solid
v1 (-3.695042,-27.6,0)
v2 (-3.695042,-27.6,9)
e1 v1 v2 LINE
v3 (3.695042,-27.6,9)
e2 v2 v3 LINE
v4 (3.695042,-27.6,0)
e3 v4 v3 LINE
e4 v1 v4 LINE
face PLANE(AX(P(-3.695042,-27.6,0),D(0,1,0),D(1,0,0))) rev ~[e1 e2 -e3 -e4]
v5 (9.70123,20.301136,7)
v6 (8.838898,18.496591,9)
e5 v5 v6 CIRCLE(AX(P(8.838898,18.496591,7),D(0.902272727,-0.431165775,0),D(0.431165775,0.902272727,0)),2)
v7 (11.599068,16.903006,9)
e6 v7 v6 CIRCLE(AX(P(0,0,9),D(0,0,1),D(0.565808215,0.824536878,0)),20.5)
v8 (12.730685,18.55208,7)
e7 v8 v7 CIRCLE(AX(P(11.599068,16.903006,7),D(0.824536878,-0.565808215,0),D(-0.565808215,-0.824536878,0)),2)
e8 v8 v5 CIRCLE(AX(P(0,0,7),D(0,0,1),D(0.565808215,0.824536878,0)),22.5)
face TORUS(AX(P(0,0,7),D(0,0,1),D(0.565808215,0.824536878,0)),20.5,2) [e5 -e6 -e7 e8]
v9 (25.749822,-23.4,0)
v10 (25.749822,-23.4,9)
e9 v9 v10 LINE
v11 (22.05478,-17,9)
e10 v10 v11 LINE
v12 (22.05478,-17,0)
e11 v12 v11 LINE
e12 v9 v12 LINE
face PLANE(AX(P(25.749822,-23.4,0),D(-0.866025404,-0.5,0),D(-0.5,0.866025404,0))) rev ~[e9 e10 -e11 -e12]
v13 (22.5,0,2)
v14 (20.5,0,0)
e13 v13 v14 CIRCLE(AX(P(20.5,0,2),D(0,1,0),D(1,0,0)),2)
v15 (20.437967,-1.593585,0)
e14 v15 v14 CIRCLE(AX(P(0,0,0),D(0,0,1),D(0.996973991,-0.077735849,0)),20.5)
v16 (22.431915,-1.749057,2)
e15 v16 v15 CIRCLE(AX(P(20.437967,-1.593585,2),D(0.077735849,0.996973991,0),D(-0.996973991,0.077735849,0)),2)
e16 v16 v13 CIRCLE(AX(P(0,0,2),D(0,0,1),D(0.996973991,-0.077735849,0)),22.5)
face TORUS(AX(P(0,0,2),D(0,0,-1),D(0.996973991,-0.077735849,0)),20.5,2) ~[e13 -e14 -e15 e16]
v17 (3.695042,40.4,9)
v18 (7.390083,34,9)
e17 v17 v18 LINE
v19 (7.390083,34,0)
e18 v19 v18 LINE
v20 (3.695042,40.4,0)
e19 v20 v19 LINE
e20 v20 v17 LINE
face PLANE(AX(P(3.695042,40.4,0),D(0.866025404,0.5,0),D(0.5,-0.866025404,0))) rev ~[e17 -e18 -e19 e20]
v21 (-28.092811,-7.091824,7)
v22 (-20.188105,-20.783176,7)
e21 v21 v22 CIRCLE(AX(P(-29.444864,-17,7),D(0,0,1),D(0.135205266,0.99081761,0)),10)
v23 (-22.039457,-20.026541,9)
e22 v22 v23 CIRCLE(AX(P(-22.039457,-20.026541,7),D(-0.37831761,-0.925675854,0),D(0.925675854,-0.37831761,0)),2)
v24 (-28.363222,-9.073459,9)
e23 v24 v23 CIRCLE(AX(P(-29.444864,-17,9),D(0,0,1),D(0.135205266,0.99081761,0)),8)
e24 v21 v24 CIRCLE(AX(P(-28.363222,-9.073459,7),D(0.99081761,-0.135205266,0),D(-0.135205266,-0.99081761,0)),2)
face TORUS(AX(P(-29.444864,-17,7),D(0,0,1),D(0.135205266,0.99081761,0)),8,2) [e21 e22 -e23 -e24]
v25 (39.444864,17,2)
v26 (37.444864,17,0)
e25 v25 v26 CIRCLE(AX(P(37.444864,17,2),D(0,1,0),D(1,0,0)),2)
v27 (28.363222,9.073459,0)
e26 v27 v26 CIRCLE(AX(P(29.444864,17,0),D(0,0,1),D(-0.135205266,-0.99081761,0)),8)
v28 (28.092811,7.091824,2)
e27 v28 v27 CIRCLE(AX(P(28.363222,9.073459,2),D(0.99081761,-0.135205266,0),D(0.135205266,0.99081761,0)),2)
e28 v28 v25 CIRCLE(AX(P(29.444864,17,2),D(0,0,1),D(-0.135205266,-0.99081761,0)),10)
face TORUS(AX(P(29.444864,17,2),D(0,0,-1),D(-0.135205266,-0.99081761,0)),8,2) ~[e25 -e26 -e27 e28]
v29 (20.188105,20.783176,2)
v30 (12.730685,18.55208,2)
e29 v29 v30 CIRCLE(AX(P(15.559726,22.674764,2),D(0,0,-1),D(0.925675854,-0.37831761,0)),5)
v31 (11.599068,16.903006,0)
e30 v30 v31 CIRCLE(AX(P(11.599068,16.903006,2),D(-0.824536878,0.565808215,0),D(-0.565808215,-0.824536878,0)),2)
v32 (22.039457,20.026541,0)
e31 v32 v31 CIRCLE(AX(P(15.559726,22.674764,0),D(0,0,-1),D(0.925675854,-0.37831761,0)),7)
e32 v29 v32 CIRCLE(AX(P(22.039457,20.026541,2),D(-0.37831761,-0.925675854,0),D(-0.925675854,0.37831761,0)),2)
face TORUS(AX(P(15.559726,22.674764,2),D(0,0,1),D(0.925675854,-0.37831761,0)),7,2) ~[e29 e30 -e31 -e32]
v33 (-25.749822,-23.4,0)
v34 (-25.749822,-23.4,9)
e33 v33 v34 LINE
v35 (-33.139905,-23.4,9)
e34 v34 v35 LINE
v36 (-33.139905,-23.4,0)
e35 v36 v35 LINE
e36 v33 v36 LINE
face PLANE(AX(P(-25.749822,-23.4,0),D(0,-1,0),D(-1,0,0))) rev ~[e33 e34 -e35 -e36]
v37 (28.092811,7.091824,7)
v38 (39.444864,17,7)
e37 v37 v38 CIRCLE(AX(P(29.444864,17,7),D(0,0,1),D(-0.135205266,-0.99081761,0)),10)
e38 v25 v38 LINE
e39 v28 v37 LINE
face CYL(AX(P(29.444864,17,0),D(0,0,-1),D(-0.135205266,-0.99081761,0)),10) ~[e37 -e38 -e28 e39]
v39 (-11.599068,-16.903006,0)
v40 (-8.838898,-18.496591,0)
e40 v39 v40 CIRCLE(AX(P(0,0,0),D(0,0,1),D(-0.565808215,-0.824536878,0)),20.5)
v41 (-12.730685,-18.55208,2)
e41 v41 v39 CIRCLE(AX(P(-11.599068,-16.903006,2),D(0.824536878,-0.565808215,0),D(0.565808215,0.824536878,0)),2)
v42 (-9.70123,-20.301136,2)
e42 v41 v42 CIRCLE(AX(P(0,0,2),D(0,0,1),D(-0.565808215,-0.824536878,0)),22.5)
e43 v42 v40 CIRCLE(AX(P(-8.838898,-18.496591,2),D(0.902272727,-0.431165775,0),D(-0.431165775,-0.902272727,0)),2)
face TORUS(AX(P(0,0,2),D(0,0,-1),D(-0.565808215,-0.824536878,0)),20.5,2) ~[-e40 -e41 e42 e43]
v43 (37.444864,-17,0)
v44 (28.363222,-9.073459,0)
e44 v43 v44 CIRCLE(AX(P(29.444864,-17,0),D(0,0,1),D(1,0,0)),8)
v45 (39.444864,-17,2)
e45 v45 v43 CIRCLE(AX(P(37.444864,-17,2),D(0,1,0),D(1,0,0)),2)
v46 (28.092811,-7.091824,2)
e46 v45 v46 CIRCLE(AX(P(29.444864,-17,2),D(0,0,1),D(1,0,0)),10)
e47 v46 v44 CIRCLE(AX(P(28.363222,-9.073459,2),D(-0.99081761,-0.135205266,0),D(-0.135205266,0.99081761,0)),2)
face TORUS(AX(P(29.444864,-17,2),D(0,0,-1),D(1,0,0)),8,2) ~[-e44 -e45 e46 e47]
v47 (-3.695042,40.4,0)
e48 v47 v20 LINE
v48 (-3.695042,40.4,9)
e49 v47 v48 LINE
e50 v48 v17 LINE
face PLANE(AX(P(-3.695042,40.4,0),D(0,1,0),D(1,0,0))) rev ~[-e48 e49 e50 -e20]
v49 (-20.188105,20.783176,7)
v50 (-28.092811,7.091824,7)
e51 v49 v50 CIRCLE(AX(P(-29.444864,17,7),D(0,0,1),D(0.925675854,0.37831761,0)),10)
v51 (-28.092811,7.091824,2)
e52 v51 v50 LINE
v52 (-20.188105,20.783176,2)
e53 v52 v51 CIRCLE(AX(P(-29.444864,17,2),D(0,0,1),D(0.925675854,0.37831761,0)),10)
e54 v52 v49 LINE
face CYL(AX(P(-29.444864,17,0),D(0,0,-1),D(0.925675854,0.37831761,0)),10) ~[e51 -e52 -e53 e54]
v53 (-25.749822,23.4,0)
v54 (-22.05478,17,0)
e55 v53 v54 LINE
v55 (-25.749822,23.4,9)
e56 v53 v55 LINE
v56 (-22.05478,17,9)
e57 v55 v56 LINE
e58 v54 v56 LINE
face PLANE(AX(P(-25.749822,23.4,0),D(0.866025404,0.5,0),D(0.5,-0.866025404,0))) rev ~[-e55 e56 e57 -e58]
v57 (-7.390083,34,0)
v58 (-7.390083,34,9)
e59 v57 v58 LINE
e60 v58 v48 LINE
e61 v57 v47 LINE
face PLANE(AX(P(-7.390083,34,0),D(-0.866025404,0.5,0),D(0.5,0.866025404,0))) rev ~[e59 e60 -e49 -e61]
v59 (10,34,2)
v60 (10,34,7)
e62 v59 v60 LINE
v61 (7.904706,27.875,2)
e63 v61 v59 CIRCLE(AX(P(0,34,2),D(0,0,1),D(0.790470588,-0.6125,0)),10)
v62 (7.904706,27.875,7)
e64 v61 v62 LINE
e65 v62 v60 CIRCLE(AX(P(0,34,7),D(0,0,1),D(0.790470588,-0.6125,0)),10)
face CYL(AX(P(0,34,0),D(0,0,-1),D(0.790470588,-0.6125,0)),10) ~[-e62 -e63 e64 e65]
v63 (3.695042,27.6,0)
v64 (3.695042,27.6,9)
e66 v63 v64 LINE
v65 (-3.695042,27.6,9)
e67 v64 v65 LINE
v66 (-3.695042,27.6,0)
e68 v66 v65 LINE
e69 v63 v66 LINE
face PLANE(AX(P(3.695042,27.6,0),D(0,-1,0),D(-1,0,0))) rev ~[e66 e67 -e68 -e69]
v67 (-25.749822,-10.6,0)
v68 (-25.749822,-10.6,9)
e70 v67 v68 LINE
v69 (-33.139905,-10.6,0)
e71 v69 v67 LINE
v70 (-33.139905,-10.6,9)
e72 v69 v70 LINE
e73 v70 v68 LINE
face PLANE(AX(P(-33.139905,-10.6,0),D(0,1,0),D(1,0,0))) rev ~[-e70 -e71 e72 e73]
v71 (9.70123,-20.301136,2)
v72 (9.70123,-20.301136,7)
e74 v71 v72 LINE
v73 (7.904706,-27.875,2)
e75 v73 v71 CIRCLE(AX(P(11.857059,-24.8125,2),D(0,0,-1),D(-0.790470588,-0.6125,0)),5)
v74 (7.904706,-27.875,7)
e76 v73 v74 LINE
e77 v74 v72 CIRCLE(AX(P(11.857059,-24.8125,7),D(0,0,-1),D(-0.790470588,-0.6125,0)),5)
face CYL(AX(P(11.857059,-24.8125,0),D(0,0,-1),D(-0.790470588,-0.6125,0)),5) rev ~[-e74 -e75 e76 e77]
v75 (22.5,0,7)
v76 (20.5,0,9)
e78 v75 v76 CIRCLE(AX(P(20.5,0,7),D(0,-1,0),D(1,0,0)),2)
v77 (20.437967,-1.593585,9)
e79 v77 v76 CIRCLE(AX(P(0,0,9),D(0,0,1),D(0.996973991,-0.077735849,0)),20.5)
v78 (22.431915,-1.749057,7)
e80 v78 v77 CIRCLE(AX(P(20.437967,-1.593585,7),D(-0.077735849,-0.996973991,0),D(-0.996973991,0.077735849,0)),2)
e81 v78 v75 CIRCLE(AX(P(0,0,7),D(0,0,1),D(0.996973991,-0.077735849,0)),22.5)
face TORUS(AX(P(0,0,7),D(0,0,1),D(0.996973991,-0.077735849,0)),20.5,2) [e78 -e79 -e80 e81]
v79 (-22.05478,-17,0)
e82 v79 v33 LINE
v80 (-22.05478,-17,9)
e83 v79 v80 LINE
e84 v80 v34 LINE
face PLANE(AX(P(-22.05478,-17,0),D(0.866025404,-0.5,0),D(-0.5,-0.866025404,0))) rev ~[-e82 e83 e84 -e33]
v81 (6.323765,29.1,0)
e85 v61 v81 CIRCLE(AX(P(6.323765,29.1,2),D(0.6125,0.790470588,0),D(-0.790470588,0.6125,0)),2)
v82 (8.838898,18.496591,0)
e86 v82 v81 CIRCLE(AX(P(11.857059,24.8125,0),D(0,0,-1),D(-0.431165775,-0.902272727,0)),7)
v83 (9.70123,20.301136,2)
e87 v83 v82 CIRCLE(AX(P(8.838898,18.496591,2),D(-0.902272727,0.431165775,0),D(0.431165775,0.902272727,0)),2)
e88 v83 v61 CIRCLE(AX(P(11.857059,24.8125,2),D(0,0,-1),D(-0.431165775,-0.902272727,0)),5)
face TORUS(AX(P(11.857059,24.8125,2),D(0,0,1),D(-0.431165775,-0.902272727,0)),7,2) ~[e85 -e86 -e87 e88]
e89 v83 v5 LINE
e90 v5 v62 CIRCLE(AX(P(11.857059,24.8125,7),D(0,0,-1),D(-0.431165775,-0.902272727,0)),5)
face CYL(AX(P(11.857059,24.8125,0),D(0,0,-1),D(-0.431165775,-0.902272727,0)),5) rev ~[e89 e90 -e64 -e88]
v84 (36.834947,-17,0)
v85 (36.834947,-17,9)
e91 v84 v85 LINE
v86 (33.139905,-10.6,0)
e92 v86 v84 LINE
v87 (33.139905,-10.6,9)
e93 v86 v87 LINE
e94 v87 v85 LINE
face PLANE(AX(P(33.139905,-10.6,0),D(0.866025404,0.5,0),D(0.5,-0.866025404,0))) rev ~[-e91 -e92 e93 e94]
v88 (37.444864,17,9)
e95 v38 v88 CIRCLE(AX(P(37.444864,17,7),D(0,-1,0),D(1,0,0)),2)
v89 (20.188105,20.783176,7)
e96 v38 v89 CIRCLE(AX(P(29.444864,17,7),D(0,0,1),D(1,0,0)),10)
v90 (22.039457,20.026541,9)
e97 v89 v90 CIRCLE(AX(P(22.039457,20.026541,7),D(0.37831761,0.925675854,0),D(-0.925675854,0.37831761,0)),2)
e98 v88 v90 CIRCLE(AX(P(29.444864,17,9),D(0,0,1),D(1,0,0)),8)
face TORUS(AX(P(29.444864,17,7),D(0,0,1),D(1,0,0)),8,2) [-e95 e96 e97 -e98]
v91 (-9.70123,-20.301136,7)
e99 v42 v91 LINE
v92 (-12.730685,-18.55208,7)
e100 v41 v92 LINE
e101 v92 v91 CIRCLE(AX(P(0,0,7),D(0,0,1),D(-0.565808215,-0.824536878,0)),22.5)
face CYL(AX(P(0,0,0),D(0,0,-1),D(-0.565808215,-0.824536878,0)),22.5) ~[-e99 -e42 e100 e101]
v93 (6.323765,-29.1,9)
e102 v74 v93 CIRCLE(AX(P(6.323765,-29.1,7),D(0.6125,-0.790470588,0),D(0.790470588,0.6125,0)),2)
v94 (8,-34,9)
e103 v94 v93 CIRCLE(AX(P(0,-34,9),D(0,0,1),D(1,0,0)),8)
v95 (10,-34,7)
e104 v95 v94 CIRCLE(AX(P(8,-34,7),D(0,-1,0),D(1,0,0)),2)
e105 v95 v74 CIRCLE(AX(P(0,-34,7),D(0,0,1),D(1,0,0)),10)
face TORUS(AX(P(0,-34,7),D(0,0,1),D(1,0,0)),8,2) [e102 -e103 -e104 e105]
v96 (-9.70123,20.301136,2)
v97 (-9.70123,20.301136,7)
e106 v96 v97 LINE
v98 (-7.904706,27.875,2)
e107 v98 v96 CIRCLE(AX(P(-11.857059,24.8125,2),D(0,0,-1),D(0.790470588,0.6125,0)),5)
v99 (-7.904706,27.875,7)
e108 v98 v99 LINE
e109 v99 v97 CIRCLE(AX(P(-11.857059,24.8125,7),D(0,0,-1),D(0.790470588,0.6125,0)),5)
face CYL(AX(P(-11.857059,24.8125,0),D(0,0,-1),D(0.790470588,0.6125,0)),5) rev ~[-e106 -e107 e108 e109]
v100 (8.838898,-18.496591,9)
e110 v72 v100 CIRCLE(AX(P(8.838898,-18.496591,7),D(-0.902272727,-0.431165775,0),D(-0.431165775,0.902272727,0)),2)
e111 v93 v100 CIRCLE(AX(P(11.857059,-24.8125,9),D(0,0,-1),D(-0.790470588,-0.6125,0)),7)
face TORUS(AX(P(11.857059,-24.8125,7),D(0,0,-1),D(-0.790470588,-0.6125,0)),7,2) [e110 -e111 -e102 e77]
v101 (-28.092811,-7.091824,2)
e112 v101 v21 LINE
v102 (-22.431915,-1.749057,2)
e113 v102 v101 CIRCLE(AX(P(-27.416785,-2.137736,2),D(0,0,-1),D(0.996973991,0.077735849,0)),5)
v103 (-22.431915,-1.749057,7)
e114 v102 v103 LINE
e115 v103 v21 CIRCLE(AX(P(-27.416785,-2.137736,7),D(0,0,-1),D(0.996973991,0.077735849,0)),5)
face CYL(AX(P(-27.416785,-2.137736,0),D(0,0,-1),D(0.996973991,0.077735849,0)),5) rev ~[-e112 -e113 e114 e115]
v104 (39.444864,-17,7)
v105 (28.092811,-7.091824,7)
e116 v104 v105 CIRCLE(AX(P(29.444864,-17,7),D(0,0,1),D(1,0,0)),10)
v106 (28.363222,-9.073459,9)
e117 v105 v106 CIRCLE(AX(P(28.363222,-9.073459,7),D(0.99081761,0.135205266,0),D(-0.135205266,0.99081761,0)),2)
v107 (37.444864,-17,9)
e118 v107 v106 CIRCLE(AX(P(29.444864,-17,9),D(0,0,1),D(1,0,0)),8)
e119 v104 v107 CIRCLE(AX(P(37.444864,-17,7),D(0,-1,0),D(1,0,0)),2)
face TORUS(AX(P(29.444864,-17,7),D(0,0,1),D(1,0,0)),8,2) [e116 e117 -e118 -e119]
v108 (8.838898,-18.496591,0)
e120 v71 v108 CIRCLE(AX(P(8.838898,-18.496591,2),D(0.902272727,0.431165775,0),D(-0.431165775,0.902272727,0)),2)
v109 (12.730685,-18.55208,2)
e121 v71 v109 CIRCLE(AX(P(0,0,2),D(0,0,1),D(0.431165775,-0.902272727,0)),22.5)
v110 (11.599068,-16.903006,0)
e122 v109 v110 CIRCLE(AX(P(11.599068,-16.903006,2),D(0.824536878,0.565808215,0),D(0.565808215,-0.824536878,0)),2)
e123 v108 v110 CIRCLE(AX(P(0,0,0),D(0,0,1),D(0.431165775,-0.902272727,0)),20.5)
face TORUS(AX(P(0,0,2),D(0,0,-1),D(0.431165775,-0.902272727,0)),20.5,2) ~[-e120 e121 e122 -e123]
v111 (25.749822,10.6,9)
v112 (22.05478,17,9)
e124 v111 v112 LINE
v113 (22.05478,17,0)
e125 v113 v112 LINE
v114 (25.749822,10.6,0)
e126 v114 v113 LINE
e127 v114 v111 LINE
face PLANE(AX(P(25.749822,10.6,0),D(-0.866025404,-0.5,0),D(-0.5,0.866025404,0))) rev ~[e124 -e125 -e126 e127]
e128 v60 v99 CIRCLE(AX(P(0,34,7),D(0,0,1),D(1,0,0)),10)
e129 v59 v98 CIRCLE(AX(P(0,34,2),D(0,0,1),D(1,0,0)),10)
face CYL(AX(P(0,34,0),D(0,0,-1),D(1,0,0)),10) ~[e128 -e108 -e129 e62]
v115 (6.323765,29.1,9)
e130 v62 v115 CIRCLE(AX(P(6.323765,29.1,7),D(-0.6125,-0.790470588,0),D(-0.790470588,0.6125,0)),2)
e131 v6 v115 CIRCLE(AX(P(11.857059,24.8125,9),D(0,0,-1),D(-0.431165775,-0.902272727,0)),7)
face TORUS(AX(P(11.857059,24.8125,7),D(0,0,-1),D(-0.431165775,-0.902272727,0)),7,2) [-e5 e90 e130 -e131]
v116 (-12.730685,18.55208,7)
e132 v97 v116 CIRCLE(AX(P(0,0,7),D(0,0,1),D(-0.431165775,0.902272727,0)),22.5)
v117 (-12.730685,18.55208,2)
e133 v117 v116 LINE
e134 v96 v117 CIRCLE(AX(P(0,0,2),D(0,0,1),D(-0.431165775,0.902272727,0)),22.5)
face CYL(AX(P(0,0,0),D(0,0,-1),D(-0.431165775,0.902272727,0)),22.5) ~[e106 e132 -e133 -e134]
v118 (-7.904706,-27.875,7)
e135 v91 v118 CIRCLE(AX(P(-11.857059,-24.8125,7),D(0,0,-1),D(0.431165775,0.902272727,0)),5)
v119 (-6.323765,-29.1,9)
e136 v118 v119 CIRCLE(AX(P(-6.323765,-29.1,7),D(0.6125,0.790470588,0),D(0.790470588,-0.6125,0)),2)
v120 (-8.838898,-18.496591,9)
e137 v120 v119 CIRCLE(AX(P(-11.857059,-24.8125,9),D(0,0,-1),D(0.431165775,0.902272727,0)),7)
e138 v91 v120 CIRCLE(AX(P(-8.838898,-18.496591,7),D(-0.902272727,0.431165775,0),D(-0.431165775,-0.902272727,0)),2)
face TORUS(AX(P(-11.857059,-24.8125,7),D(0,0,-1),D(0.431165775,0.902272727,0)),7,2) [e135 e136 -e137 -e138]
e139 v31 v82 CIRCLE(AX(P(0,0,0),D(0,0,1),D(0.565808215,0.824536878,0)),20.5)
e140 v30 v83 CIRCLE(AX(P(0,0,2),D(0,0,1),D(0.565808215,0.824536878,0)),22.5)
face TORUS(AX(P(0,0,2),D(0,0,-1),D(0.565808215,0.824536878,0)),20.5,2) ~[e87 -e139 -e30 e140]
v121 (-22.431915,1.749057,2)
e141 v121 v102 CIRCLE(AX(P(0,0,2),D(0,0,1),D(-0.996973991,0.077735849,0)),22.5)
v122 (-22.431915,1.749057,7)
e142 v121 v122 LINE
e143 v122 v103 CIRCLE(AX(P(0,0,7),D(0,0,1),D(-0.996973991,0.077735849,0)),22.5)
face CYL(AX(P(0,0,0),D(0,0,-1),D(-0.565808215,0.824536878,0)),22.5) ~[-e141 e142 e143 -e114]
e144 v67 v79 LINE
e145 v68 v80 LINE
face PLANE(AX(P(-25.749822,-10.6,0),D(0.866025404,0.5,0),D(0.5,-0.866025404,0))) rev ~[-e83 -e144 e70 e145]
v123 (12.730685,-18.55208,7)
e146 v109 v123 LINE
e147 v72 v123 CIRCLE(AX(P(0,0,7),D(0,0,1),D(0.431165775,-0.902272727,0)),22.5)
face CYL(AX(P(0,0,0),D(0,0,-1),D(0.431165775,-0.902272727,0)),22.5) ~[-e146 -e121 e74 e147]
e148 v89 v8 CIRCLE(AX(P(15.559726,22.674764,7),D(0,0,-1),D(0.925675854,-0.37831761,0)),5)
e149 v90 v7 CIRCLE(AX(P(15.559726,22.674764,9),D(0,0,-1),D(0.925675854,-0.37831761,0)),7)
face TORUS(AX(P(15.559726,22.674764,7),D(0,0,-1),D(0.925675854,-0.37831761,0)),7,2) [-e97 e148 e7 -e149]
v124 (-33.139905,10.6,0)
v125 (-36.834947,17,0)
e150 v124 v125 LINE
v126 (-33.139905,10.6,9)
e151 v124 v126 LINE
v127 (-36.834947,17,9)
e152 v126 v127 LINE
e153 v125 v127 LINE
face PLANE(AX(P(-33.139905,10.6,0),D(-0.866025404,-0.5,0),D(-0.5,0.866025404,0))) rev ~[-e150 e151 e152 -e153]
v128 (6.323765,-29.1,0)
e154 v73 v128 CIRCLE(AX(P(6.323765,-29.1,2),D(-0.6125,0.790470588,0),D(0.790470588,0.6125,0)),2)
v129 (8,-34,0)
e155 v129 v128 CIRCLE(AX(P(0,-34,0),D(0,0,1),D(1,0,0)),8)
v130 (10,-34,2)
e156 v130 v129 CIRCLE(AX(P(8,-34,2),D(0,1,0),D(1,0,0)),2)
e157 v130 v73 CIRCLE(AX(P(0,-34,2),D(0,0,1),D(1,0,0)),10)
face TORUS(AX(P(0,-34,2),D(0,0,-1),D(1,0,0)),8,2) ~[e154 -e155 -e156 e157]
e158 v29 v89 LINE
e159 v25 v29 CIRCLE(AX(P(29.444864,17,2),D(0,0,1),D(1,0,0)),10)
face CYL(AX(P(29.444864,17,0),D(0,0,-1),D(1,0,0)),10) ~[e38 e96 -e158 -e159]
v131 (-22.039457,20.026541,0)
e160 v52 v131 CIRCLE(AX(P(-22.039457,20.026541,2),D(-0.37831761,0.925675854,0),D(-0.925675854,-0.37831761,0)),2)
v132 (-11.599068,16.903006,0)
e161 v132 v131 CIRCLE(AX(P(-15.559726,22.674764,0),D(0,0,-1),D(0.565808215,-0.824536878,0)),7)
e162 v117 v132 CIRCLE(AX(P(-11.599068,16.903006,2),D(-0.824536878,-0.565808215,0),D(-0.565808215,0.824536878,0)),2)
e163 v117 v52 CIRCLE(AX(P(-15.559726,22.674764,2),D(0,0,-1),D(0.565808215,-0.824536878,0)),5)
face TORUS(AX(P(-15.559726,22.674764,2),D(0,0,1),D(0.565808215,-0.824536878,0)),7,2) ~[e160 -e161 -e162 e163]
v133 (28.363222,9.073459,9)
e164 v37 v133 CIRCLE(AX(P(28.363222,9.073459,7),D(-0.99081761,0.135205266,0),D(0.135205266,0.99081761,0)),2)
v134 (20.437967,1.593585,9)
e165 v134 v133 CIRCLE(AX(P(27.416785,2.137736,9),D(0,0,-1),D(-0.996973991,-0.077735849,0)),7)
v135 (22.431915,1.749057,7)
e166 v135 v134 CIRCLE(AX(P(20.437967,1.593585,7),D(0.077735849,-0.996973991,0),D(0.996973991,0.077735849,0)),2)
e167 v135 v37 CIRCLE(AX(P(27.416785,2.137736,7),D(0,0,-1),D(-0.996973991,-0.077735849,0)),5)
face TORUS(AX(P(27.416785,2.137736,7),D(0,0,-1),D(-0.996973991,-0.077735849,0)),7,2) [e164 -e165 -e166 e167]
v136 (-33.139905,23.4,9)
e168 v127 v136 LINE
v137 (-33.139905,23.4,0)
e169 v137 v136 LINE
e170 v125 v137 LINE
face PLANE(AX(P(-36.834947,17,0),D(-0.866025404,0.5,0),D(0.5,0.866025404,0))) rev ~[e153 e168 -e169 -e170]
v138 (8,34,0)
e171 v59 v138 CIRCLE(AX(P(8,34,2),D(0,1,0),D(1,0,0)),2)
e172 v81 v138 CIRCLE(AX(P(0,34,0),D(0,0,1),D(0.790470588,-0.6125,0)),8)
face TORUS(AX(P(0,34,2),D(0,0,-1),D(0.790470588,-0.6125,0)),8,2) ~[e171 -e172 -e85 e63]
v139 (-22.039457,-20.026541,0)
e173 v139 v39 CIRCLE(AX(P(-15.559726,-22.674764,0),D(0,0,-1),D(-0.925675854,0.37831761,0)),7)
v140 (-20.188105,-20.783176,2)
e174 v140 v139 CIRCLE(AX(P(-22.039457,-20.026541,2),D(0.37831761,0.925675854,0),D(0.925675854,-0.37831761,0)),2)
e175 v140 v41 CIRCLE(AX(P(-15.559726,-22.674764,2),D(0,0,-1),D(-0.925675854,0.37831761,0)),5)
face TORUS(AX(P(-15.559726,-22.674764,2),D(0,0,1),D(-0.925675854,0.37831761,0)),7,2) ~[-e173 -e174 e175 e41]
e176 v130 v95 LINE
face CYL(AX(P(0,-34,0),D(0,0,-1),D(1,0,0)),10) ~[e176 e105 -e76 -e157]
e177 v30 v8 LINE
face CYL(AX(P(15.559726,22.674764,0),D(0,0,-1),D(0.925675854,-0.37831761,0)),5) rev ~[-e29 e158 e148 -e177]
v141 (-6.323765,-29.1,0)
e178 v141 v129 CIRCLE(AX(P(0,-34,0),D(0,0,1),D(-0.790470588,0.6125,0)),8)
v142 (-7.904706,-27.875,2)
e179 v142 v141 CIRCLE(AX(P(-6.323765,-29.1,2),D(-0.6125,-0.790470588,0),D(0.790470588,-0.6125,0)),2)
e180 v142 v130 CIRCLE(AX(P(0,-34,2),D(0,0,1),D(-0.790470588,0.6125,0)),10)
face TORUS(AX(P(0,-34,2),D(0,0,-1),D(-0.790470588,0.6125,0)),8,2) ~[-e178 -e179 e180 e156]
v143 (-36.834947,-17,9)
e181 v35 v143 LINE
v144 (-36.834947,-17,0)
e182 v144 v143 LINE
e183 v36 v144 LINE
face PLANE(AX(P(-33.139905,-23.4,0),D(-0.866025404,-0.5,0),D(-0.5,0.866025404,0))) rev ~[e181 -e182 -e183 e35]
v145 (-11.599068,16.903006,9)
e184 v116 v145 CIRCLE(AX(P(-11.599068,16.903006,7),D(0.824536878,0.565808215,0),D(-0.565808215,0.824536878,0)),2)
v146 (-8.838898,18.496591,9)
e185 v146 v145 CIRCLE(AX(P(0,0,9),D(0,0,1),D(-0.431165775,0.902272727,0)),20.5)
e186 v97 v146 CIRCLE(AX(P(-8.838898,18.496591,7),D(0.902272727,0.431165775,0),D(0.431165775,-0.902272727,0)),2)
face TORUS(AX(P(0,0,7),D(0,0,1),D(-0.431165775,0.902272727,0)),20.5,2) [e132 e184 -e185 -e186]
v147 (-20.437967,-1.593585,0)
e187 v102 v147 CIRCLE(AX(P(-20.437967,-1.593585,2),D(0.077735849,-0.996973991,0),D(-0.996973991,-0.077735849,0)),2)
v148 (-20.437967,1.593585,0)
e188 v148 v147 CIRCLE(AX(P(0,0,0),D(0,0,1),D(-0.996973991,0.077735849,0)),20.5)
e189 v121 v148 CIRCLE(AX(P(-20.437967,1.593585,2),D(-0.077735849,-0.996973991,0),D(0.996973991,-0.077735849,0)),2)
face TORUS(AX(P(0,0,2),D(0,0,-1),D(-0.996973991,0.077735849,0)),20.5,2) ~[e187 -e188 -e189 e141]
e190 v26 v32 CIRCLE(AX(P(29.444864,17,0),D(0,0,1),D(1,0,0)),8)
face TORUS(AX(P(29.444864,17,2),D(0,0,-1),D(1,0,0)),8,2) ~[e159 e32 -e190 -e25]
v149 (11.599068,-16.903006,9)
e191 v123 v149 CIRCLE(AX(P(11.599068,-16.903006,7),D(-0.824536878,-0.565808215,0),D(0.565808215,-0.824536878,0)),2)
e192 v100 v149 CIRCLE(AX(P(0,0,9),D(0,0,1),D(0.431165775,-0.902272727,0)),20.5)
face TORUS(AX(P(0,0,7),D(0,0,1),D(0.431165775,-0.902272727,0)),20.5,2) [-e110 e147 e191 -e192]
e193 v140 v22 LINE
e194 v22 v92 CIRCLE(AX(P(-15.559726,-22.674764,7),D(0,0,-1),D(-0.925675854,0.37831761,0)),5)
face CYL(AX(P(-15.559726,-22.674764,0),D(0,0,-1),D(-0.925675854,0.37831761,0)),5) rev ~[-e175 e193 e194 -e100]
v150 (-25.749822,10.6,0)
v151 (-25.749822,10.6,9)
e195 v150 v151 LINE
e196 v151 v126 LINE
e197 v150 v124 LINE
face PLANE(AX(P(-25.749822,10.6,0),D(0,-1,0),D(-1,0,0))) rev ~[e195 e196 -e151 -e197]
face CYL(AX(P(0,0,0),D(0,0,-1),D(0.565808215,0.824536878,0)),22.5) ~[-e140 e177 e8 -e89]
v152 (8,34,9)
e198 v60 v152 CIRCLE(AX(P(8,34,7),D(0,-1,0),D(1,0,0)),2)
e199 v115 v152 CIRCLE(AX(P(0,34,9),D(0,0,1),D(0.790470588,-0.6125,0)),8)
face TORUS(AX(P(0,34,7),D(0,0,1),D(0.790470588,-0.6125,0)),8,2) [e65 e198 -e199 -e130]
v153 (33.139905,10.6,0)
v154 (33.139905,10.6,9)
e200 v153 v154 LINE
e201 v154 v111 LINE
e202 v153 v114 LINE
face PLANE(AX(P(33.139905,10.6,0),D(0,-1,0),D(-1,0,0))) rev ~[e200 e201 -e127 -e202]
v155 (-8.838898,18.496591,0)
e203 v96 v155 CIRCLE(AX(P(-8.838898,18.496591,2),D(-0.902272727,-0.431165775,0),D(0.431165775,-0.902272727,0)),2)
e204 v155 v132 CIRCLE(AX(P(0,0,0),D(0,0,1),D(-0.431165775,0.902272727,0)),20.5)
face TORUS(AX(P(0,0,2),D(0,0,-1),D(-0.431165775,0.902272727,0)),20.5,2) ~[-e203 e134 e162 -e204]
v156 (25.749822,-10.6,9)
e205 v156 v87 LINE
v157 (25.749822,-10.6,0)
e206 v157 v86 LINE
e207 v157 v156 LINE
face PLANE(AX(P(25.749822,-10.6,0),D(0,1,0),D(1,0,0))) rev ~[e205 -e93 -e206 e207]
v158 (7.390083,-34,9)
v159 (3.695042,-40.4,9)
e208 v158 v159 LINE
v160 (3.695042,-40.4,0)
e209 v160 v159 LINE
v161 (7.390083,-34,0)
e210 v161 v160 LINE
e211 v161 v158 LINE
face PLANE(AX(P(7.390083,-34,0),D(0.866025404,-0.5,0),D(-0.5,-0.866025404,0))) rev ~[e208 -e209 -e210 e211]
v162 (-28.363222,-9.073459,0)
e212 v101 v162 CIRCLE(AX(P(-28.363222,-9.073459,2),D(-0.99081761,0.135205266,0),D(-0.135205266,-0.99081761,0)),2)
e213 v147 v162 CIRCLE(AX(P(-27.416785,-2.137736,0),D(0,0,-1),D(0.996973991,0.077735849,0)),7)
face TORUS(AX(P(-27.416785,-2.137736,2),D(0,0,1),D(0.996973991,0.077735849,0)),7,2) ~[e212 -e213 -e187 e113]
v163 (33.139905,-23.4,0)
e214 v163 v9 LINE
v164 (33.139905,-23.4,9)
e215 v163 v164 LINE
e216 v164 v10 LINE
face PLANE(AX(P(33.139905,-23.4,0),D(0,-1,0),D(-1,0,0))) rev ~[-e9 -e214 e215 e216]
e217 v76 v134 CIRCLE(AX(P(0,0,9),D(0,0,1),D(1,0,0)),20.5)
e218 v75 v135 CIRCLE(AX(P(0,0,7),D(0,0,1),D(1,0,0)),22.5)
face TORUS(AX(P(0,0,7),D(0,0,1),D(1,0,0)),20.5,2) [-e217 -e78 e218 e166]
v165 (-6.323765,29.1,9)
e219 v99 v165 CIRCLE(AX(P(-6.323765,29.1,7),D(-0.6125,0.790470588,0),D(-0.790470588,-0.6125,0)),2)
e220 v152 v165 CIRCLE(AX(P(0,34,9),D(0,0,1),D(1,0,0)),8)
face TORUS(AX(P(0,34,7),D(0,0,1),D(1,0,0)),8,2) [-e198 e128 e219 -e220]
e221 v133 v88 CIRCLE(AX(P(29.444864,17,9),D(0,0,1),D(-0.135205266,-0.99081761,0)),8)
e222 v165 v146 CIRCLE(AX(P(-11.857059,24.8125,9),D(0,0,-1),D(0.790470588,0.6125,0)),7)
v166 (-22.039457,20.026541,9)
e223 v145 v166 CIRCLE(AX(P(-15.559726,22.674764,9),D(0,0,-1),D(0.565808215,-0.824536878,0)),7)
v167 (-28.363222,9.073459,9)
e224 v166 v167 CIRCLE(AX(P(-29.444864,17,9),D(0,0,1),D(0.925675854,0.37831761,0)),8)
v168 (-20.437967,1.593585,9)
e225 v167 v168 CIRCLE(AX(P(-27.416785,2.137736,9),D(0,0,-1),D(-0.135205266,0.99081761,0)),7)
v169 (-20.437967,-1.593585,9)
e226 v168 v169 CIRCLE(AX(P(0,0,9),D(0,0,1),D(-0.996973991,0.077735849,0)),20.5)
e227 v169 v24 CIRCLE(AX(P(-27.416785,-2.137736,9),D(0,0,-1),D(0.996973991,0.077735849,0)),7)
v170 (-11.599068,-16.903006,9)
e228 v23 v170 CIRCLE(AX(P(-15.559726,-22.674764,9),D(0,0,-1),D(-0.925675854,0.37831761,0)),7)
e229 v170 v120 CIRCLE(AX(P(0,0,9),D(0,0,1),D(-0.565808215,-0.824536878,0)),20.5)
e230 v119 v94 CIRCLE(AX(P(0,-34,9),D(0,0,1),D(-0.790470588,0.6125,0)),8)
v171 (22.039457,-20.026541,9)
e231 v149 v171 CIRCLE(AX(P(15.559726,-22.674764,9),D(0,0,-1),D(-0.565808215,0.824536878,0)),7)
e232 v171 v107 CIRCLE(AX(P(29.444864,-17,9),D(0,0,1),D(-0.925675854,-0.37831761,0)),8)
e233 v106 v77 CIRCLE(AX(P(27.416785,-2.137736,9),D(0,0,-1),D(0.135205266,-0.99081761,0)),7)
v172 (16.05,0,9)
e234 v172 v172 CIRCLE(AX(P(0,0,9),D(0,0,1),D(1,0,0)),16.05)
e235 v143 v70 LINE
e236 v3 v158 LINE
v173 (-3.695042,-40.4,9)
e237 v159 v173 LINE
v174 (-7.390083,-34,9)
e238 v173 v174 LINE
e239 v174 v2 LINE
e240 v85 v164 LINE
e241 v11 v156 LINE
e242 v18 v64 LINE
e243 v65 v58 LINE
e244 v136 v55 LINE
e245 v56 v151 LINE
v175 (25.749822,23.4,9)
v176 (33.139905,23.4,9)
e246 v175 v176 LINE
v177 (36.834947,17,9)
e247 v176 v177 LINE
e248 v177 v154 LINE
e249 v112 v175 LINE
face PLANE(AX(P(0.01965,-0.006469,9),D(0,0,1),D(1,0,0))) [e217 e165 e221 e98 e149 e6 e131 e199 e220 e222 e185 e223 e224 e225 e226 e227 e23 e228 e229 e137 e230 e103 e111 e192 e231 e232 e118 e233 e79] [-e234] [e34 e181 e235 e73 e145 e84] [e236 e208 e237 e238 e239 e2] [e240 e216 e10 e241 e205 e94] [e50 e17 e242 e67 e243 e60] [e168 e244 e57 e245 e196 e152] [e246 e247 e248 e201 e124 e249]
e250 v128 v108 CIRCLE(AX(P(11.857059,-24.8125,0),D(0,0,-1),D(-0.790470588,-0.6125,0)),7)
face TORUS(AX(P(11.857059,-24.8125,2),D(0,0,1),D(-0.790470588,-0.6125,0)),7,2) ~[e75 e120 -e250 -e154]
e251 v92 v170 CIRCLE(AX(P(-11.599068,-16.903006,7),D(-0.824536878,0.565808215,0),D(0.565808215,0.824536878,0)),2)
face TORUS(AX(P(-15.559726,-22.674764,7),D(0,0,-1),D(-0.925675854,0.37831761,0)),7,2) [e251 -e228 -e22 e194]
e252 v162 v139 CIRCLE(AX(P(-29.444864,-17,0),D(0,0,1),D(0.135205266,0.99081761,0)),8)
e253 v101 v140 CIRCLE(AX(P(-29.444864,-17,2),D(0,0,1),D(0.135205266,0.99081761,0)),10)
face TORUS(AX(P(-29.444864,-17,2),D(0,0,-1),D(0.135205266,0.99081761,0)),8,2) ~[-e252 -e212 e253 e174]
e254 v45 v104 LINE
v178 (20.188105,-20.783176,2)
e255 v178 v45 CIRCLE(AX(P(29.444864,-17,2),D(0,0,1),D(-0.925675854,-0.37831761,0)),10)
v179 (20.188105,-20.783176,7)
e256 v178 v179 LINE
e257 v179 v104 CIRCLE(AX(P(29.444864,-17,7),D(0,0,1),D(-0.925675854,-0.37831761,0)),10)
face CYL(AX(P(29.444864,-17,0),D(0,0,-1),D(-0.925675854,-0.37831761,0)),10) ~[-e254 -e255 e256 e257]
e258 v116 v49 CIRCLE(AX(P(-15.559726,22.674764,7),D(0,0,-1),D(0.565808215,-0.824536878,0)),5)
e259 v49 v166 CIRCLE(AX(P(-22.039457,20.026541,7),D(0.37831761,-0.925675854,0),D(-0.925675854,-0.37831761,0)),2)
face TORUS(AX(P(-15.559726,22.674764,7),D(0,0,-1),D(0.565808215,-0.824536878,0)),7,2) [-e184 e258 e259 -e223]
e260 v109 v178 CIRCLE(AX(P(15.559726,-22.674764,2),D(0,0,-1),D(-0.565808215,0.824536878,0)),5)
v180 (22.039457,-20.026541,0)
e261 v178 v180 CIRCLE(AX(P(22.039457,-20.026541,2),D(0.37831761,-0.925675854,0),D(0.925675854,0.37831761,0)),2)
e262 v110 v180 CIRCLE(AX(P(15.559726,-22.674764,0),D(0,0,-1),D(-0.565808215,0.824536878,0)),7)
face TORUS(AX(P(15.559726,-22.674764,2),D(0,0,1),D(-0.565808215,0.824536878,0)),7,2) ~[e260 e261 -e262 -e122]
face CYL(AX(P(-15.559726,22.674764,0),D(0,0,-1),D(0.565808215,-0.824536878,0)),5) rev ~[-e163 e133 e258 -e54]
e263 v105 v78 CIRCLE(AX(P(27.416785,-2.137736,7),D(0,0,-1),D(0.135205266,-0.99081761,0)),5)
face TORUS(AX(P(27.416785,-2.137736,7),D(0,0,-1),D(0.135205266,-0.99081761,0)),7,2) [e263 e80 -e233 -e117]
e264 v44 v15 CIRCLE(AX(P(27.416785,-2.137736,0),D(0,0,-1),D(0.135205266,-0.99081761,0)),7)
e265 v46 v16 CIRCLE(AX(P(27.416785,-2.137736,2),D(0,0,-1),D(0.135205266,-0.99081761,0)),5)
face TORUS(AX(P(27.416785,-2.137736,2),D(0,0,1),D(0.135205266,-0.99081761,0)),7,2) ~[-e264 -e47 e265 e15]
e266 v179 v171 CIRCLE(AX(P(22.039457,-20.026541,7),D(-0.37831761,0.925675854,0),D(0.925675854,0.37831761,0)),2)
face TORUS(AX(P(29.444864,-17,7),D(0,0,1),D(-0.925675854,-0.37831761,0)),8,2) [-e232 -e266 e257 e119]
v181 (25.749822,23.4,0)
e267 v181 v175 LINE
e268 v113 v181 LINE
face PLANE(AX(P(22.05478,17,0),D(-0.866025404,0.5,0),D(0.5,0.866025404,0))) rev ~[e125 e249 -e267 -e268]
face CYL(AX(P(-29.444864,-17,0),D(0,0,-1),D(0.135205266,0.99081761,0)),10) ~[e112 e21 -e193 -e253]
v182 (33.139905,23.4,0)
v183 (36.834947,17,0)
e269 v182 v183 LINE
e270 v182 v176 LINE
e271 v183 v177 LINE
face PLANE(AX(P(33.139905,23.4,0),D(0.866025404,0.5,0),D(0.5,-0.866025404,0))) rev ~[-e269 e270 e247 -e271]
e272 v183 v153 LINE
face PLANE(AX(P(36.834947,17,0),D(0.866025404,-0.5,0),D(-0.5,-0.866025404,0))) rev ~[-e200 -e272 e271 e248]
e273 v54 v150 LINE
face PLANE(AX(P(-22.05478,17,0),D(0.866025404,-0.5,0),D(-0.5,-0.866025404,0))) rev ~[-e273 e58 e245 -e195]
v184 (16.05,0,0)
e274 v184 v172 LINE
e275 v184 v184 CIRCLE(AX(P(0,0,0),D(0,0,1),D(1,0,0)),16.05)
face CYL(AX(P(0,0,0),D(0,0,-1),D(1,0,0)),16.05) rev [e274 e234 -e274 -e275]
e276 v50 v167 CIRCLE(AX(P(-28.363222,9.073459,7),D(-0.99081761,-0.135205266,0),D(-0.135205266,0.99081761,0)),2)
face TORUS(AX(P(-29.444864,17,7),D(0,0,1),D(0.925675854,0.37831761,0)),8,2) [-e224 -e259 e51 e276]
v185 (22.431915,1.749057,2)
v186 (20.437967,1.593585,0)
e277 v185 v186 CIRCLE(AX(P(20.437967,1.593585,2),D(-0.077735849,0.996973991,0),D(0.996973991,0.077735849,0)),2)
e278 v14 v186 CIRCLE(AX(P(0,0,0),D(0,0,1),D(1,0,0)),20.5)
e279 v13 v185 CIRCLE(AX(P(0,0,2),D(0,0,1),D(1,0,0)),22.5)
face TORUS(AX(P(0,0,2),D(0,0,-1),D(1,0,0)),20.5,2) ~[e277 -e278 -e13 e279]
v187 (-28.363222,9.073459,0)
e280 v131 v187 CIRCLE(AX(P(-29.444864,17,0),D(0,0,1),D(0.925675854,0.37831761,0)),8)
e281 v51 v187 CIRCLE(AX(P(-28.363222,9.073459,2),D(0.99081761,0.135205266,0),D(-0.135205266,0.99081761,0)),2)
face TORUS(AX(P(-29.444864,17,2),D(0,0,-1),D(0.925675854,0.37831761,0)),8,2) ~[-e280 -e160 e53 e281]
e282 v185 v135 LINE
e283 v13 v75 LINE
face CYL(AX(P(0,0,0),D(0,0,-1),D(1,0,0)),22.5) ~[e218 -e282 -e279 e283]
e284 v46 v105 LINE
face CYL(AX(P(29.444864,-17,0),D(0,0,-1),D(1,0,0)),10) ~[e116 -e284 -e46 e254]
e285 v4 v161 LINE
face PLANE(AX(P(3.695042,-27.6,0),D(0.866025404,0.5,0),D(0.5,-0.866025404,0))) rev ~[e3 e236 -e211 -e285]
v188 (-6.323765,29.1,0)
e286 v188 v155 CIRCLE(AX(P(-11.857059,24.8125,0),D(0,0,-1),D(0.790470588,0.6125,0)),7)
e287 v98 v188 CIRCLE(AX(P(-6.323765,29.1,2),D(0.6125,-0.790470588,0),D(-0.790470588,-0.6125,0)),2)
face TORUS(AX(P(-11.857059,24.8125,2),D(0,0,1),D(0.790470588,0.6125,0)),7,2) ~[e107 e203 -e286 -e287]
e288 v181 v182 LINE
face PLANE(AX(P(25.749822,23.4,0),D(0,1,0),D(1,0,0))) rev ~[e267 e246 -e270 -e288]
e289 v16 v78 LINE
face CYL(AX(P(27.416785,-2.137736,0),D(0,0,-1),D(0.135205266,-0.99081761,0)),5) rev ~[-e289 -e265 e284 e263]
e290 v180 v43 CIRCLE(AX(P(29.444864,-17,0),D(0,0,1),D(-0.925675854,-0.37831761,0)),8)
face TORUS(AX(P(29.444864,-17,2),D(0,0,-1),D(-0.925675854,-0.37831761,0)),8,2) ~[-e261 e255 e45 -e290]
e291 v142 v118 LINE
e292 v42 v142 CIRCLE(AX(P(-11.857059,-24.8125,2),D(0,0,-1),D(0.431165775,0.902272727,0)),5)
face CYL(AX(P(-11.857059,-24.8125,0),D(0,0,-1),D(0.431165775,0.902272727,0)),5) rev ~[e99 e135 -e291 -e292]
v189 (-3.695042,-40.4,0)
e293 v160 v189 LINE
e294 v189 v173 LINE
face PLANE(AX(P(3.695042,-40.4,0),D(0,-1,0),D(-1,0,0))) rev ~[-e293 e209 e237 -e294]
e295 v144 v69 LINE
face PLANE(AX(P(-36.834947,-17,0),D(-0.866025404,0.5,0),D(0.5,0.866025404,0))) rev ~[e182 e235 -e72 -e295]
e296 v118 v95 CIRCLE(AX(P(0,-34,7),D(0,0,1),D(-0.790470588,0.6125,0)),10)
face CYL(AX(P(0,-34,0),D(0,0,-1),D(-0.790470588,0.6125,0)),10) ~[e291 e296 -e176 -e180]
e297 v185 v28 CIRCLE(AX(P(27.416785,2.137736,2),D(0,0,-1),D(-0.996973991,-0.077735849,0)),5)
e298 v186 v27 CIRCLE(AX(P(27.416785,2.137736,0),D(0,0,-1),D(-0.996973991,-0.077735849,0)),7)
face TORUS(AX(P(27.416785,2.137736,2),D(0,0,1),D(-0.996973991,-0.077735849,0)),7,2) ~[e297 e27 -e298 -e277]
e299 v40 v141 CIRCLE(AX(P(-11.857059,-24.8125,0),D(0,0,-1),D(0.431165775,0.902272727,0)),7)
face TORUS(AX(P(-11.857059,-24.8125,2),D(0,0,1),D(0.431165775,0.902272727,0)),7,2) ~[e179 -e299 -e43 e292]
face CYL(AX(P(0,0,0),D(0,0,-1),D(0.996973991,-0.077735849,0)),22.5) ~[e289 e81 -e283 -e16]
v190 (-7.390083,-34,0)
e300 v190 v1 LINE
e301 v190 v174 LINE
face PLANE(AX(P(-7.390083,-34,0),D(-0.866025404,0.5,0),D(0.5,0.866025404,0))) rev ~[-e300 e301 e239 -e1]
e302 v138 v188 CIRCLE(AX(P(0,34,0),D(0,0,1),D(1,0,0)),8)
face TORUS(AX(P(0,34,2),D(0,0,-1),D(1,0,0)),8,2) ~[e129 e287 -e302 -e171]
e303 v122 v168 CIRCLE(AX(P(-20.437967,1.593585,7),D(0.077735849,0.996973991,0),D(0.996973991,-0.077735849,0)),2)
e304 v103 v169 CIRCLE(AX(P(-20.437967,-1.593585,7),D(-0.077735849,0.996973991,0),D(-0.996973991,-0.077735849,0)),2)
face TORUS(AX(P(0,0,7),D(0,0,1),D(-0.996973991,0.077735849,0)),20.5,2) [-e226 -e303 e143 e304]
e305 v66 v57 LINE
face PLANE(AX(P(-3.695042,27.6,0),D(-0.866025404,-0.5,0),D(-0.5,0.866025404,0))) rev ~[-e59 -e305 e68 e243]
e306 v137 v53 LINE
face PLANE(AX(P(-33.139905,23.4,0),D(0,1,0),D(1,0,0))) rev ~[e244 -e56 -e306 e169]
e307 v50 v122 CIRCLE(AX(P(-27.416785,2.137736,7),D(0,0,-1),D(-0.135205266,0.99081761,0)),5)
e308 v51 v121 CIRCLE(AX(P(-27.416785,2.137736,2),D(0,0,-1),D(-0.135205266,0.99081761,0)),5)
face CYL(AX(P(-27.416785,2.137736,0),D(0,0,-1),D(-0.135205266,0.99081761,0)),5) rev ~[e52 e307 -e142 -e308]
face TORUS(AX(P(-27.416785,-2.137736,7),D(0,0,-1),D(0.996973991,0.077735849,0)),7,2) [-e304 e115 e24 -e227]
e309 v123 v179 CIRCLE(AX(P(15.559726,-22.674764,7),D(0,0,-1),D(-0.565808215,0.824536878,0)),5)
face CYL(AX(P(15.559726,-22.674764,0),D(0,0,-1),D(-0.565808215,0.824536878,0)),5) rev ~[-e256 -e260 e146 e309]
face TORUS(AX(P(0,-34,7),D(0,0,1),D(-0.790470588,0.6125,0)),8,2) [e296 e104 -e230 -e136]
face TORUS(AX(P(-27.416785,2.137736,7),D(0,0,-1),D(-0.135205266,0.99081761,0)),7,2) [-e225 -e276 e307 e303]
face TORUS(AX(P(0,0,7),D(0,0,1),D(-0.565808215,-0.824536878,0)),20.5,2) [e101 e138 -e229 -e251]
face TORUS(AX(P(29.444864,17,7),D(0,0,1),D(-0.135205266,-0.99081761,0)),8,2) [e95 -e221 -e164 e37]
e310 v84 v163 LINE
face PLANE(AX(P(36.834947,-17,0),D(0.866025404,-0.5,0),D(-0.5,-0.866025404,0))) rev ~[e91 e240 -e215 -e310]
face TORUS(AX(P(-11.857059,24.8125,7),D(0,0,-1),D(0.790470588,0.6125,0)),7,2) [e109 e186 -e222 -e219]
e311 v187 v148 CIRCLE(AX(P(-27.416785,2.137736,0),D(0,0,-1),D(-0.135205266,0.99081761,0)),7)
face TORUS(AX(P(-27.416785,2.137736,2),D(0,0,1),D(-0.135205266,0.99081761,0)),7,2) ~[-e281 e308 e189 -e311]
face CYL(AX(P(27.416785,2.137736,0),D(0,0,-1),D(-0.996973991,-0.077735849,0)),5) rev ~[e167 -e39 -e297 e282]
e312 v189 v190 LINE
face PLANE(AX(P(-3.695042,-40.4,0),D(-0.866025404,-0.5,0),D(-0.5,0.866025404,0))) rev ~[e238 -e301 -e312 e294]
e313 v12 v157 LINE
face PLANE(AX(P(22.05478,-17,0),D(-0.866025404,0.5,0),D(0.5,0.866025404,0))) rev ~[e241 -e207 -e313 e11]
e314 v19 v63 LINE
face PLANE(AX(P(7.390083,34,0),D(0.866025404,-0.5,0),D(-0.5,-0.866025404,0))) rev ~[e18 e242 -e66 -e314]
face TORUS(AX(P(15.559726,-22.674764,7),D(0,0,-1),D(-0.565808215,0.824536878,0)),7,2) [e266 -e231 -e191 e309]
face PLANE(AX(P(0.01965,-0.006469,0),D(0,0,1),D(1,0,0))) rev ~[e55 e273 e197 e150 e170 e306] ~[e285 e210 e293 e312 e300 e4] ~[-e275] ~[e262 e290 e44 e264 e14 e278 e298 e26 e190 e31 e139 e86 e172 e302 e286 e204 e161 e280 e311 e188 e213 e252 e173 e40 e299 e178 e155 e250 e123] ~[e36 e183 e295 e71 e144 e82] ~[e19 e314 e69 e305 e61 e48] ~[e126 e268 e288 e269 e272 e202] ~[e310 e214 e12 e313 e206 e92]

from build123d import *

# Parameters (mm, degrees)
F0_R     = 16.05
F1_DEPTH = 9
F2_R     = 2


# Not quite as in the source:
# - a feature names something its author has since deleted; it is built from what else it names


with BuildPart() as f1:
    # F0 (on Top) → F1 (new body)
    with BuildSketch(Plane.XY):
        with BuildLine():
            ThreePointArc((22.4319147865, -1.749056606), (22.4829722534, -0.8751906374), (22.5, 0))
            ThreePointArc((22.5, 0), (22.4829722534, 0.8751906374), (22.4319147865, 1.749056606))
            ThreePointArc((22.4319147865, 1.749056606), (19.4855715851, 11.25), (12.7306848467, 18.5520797576))
            ThreePointArc((12.7306848467, 18.5520797576), (11.25, 19.4855715851), (9.7012299398, 20.3011363636))
            ThreePointArc((9.7012299398, 20.3011363636), (0, 22.5), (-9.7012299398, 20.3011363636))
            ThreePointArc((-9.7012299398, 20.3011363636), (-11.25, 19.4855715851), (-12.7306848467, 18.5520797576))
            ThreePointArc((-12.7306848467, 18.5520797576), (-19.4855715851, 11.25), (-22.4319147865, 1.749056606))
            ThreePointArc((-22.4319147865, 1.749056606), (-22.5, 0), (-22.4319147865, -1.749056606))
            ThreePointArc((-22.4319147865, -1.749056606), (-19.4855715851, -11.25), (-12.7306848467, -18.5520797576))
            ThreePointArc((-12.7306848467, -18.5520797576), (-11.25, -19.4855715851), (-9.7012299398, -20.3011363636))
            ThreePointArc((-9.7012299398, -20.3011363636), (0, -22.5), (9.7012299398, -20.3011363636))
            ThreePointArc((9.7012299398, -20.3011363636), (11.25, -19.4855715851), (12.7306848467, -18.5520797576))
            ThreePointArc((12.7306848467, -18.5520797576), (19.4855715851, -11.25), (22.4319147865, -1.749056606))
        make_face()
        Circle(F0_R, mode=Mode.SUBTRACT)
        with BuildLine():
            ThreePointArc((12.7306848467, 18.5520797576), (19.4855715851, 11.25), (22.4319147865, 1.749056606))
            ThreePointArc((22.4319147865, 1.749056606), (23.9849013008, 5.7739668766), (28.0928110689, 7.0918239012))
            ThreePointArc((28.0928110689, 7.0918239012), (20.7846096908, 12), (20.1881051921, 20.7831760988))
            ThreePointArc((20.1881051921, 20.7831760988), (16.9928526462, 17.8845503954), (12.7306848467, 18.5520797576))
        make_face()
        with BuildLine():
            ThreePointArc((28.0928110689, -7.0918239012), (23.9849013008, -5.7739668766), (22.4319147865, -1.749056606))
            ThreePointArc((22.4319147865, -1.749056606), (19.4855715851, -11.25), (12.7306848467, -18.5520797576))
            ThreePointArc((12.7306848467, -18.5520797576), (16.9928526462, -17.8845503954), (20.1881051921, -20.7831760988))
            ThreePointArc((20.1881051921, -20.7831760988), (20.7846096908, -12), (28.0928110689, -7.0918239012))
        make_face()
        with BuildLine():
            ThreePointArc((20.1881051921, 20.7831760988), (20.7846096908, 12), (28.0928110689, 7.0918239012))
            ThreePointArc((28.0928110689, 7.0918239012), (36.0205565972, 9.4660592451), (39.4448637287, 17))
            ThreePointArc((39.4448637287, 17), (31.3726104228, 26.8124305186), (20.1881051921, 20.7831760988))
        make_face()
        Polygon((36.8349471743, 17), (33.1399054515, 10.6), (25.7498220059, 10.6), (22.054780283, 17), (25.7498220059, 23.4), (33.1399054515, 23.4), align=None, mode=Mode.SUBTRACT)
        with BuildLine():
            ThreePointArc((39.4448637287, -17), (36.0205565972, -9.4660592451), (28.0928110689, -7.0918239012))
            ThreePointArc((28.0928110689, -7.0918239012), (20.7846096908, -12), (20.1881051921, -20.7831760988))
            ThreePointArc((20.1881051921, -20.7831760988), (31.3726104228, -26.8124305186), (39.4448637287, -17))
        make_face()
        Polygon((22.054780283, -17), (25.7498220059, -10.6), (33.1399054515, -10.6), (36.8349471743, -17), (33.1399054515, -23.4), (25.7498220059, -23.4), align=None, mode=Mode.SUBTRACT)
        with BuildLine():
            ThreePointArc((-9.7012299398, 20.3011363636), (0, 22.5), (9.7012299398, 20.3011363636))
            ThreePointArc((9.7012299398, 20.3011363636), (6.9920486546, 23.6585172721), (7.9047058769, 27.875))
            ThreePointArc((7.9047058769, 27.875), (0, 24), (-7.9047058769, 27.875))
            ThreePointArc((-7.9047058769, 27.875), (-6.9920486546, 23.6585172721), (-9.7012299398, 20.3011363636))
        make_face()
        with BuildLine():
            ThreePointArc((7.9047058769, -27.875), (6.9920486546, -23.6585172721), (9.7012299398, -20.3011363636))
            ThreePointArc((9.7012299398, -20.3011363636), (0, -22.5), (-9.7012299398, -20.3011363636))
            ThreePointArc((-9.7012299398, -20.3011363636), (-6.9920486546, -23.6585172721), (-7.9047058769, -27.875))
            ThreePointArc((-7.9047058769, -27.875), (0, -24), (7.9047058769, -27.875))
        make_face()
        with BuildLine():
            ThreePointArc((-7.9047058769, 27.875), (0, 24), (7.9047058769, 27.875))
            ThreePointArc((7.9047058769, 27.875), (9.4616874491, 30.7632623499), (10, 34))
            ThreePointArc((10, 34), (-3.2367376501, 43.4616874491), (-7.9047058769, 27.875))
        make_face()
        Polygon((7.3900834456, 34), (3.6950417228, 27.6), (-3.6950417228, 27.6), (-7.3900834456, 34), (-3.6950417228, 40.4), (3.6950417228, 40.4), align=None, mode=Mode.SUBTRACT)
        with BuildLine():
            ThreePointArc((10, -34), (9.4616874491, -30.7632623499), (7.9047058769, -27.875))
            ThreePointArc((7.9047058769, -27.875), (0, -24), (-7.9047058769, -27.875))
            ThreePointArc((-7.9047058769, -27.875), (-3.2367376501, -43.4616874491), (10, -34))
        make_face()
        Polygon((-7.3900834456, -34), (-3.6950417228, -27.6), (3.6950417228, -27.6), (7.3900834456, -34), (3.6950417228, -40.4), (-3.6950417228, -40.4), align=None, mode=Mode.SUBTRACT)
        with BuildLine():
            ThreePointArc((-22.4319147865, 1.749056606), (-19.4855715851, 11.25), (-12.7306848467, 18.5520797576))
            ThreePointArc((-12.7306848467, 18.5520797576), (-16.9928526462, 17.8845503954), (-20.1881051921, 20.7831760988))
            ThreePointArc((-20.1881051921, 20.7831760988), (-19.63243321, 18.9277466942), (-19.4448637287, 17))
            ThreePointArc((-19.4448637287, 17), (-21.9109229737, 10.4243071315), (-28.0928110689, 7.0918239012))
            ThreePointArc((-28.0928110689, 7.0918239012), (-23.9849013008, 5.7739668766), (-22.4319147865, 1.749056606))
        make_face()
        with BuildLine():
            ThreePointArc((-20.1881051921, -20.7831760988), (-16.9928526462, -17.8845503954), (-12.7306848467, -18.5520797576))
            ThreePointArc((-12.7306848467, -18.5520797576), (-19.4855715851, -11.25), (-22.4319147865, -1.749056606))
            ThreePointArc((-22.4319147865, -1.749056606), (-23.9849013008, -5.7739668766), (-28.0928110689, -7.0918239012))
            ThreePointArc((-28.0928110689, -7.0918239012), (-21.9109229737, -10.4243071315), (-19.4448637287, -17))
            ThreePointArc((-19.4448637287, -17), (-19.63243321, -18.9277466942), (-20.1881051921, -20.7831760988))
        make_face()
        with BuildLine():
            ThreePointArc((-19.4448637287, 17), (-19.63243321, 18.9277466942), (-20.1881051921, 20.7831760988))
            ThreePointArc((-20.1881051921, 20.7831760988), (-38.1051177665, 22), (-28.0928110689, 7.0918239012))
            ThreePointArc((-28.0928110689, 7.0918239012), (-21.9109229737, 10.4243071315), (-19.4448637287, 17))
        make_face()
        Polygon((-25.7498220059, 23.4), (-22.054780283, 17), (-25.7498220059, 10.6), (-33.1399054515, 10.6), (-36.8349471743, 17), (-33.1399054515, 23.4), align=None, mode=Mode.SUBTRACT)
        with BuildLine():
            ThreePointArc((-28.0928110689, -7.0918239012), (-38.1051177665, -22), (-20.1881051921, -20.7831760988))
            ThreePointArc((-20.1881051921, -20.7831760988), (-19.63243321, -18.9277466942), (-19.4448637287, -17))
            ThreePointArc((-19.4448637287, -17), (-21.9109229737, -10.4243071315), (-28.0928110689, -7.0918239012))
        make_face()
        Polygon((-33.1399054515, -10.6), (-25.7498220059, -10.6), (-22.054780283, -17), (-25.7498220059, -23.4), (-33.1399054515, -23.4), (-36.8349471743, -17), align=None, mode=Mode.SUBTRACT)
    extrude(amount=F1_DEPTH)

    # F2
    f2_edges = [f1.edges().sort_by_distance(p)[0] for p in [
        (-23.984901, 5.773967, 9),
        (-23.984901, 5.773967, 0),
    ]]
    fillet(f2_edges, radius=F2_R)


solid = f1.part
